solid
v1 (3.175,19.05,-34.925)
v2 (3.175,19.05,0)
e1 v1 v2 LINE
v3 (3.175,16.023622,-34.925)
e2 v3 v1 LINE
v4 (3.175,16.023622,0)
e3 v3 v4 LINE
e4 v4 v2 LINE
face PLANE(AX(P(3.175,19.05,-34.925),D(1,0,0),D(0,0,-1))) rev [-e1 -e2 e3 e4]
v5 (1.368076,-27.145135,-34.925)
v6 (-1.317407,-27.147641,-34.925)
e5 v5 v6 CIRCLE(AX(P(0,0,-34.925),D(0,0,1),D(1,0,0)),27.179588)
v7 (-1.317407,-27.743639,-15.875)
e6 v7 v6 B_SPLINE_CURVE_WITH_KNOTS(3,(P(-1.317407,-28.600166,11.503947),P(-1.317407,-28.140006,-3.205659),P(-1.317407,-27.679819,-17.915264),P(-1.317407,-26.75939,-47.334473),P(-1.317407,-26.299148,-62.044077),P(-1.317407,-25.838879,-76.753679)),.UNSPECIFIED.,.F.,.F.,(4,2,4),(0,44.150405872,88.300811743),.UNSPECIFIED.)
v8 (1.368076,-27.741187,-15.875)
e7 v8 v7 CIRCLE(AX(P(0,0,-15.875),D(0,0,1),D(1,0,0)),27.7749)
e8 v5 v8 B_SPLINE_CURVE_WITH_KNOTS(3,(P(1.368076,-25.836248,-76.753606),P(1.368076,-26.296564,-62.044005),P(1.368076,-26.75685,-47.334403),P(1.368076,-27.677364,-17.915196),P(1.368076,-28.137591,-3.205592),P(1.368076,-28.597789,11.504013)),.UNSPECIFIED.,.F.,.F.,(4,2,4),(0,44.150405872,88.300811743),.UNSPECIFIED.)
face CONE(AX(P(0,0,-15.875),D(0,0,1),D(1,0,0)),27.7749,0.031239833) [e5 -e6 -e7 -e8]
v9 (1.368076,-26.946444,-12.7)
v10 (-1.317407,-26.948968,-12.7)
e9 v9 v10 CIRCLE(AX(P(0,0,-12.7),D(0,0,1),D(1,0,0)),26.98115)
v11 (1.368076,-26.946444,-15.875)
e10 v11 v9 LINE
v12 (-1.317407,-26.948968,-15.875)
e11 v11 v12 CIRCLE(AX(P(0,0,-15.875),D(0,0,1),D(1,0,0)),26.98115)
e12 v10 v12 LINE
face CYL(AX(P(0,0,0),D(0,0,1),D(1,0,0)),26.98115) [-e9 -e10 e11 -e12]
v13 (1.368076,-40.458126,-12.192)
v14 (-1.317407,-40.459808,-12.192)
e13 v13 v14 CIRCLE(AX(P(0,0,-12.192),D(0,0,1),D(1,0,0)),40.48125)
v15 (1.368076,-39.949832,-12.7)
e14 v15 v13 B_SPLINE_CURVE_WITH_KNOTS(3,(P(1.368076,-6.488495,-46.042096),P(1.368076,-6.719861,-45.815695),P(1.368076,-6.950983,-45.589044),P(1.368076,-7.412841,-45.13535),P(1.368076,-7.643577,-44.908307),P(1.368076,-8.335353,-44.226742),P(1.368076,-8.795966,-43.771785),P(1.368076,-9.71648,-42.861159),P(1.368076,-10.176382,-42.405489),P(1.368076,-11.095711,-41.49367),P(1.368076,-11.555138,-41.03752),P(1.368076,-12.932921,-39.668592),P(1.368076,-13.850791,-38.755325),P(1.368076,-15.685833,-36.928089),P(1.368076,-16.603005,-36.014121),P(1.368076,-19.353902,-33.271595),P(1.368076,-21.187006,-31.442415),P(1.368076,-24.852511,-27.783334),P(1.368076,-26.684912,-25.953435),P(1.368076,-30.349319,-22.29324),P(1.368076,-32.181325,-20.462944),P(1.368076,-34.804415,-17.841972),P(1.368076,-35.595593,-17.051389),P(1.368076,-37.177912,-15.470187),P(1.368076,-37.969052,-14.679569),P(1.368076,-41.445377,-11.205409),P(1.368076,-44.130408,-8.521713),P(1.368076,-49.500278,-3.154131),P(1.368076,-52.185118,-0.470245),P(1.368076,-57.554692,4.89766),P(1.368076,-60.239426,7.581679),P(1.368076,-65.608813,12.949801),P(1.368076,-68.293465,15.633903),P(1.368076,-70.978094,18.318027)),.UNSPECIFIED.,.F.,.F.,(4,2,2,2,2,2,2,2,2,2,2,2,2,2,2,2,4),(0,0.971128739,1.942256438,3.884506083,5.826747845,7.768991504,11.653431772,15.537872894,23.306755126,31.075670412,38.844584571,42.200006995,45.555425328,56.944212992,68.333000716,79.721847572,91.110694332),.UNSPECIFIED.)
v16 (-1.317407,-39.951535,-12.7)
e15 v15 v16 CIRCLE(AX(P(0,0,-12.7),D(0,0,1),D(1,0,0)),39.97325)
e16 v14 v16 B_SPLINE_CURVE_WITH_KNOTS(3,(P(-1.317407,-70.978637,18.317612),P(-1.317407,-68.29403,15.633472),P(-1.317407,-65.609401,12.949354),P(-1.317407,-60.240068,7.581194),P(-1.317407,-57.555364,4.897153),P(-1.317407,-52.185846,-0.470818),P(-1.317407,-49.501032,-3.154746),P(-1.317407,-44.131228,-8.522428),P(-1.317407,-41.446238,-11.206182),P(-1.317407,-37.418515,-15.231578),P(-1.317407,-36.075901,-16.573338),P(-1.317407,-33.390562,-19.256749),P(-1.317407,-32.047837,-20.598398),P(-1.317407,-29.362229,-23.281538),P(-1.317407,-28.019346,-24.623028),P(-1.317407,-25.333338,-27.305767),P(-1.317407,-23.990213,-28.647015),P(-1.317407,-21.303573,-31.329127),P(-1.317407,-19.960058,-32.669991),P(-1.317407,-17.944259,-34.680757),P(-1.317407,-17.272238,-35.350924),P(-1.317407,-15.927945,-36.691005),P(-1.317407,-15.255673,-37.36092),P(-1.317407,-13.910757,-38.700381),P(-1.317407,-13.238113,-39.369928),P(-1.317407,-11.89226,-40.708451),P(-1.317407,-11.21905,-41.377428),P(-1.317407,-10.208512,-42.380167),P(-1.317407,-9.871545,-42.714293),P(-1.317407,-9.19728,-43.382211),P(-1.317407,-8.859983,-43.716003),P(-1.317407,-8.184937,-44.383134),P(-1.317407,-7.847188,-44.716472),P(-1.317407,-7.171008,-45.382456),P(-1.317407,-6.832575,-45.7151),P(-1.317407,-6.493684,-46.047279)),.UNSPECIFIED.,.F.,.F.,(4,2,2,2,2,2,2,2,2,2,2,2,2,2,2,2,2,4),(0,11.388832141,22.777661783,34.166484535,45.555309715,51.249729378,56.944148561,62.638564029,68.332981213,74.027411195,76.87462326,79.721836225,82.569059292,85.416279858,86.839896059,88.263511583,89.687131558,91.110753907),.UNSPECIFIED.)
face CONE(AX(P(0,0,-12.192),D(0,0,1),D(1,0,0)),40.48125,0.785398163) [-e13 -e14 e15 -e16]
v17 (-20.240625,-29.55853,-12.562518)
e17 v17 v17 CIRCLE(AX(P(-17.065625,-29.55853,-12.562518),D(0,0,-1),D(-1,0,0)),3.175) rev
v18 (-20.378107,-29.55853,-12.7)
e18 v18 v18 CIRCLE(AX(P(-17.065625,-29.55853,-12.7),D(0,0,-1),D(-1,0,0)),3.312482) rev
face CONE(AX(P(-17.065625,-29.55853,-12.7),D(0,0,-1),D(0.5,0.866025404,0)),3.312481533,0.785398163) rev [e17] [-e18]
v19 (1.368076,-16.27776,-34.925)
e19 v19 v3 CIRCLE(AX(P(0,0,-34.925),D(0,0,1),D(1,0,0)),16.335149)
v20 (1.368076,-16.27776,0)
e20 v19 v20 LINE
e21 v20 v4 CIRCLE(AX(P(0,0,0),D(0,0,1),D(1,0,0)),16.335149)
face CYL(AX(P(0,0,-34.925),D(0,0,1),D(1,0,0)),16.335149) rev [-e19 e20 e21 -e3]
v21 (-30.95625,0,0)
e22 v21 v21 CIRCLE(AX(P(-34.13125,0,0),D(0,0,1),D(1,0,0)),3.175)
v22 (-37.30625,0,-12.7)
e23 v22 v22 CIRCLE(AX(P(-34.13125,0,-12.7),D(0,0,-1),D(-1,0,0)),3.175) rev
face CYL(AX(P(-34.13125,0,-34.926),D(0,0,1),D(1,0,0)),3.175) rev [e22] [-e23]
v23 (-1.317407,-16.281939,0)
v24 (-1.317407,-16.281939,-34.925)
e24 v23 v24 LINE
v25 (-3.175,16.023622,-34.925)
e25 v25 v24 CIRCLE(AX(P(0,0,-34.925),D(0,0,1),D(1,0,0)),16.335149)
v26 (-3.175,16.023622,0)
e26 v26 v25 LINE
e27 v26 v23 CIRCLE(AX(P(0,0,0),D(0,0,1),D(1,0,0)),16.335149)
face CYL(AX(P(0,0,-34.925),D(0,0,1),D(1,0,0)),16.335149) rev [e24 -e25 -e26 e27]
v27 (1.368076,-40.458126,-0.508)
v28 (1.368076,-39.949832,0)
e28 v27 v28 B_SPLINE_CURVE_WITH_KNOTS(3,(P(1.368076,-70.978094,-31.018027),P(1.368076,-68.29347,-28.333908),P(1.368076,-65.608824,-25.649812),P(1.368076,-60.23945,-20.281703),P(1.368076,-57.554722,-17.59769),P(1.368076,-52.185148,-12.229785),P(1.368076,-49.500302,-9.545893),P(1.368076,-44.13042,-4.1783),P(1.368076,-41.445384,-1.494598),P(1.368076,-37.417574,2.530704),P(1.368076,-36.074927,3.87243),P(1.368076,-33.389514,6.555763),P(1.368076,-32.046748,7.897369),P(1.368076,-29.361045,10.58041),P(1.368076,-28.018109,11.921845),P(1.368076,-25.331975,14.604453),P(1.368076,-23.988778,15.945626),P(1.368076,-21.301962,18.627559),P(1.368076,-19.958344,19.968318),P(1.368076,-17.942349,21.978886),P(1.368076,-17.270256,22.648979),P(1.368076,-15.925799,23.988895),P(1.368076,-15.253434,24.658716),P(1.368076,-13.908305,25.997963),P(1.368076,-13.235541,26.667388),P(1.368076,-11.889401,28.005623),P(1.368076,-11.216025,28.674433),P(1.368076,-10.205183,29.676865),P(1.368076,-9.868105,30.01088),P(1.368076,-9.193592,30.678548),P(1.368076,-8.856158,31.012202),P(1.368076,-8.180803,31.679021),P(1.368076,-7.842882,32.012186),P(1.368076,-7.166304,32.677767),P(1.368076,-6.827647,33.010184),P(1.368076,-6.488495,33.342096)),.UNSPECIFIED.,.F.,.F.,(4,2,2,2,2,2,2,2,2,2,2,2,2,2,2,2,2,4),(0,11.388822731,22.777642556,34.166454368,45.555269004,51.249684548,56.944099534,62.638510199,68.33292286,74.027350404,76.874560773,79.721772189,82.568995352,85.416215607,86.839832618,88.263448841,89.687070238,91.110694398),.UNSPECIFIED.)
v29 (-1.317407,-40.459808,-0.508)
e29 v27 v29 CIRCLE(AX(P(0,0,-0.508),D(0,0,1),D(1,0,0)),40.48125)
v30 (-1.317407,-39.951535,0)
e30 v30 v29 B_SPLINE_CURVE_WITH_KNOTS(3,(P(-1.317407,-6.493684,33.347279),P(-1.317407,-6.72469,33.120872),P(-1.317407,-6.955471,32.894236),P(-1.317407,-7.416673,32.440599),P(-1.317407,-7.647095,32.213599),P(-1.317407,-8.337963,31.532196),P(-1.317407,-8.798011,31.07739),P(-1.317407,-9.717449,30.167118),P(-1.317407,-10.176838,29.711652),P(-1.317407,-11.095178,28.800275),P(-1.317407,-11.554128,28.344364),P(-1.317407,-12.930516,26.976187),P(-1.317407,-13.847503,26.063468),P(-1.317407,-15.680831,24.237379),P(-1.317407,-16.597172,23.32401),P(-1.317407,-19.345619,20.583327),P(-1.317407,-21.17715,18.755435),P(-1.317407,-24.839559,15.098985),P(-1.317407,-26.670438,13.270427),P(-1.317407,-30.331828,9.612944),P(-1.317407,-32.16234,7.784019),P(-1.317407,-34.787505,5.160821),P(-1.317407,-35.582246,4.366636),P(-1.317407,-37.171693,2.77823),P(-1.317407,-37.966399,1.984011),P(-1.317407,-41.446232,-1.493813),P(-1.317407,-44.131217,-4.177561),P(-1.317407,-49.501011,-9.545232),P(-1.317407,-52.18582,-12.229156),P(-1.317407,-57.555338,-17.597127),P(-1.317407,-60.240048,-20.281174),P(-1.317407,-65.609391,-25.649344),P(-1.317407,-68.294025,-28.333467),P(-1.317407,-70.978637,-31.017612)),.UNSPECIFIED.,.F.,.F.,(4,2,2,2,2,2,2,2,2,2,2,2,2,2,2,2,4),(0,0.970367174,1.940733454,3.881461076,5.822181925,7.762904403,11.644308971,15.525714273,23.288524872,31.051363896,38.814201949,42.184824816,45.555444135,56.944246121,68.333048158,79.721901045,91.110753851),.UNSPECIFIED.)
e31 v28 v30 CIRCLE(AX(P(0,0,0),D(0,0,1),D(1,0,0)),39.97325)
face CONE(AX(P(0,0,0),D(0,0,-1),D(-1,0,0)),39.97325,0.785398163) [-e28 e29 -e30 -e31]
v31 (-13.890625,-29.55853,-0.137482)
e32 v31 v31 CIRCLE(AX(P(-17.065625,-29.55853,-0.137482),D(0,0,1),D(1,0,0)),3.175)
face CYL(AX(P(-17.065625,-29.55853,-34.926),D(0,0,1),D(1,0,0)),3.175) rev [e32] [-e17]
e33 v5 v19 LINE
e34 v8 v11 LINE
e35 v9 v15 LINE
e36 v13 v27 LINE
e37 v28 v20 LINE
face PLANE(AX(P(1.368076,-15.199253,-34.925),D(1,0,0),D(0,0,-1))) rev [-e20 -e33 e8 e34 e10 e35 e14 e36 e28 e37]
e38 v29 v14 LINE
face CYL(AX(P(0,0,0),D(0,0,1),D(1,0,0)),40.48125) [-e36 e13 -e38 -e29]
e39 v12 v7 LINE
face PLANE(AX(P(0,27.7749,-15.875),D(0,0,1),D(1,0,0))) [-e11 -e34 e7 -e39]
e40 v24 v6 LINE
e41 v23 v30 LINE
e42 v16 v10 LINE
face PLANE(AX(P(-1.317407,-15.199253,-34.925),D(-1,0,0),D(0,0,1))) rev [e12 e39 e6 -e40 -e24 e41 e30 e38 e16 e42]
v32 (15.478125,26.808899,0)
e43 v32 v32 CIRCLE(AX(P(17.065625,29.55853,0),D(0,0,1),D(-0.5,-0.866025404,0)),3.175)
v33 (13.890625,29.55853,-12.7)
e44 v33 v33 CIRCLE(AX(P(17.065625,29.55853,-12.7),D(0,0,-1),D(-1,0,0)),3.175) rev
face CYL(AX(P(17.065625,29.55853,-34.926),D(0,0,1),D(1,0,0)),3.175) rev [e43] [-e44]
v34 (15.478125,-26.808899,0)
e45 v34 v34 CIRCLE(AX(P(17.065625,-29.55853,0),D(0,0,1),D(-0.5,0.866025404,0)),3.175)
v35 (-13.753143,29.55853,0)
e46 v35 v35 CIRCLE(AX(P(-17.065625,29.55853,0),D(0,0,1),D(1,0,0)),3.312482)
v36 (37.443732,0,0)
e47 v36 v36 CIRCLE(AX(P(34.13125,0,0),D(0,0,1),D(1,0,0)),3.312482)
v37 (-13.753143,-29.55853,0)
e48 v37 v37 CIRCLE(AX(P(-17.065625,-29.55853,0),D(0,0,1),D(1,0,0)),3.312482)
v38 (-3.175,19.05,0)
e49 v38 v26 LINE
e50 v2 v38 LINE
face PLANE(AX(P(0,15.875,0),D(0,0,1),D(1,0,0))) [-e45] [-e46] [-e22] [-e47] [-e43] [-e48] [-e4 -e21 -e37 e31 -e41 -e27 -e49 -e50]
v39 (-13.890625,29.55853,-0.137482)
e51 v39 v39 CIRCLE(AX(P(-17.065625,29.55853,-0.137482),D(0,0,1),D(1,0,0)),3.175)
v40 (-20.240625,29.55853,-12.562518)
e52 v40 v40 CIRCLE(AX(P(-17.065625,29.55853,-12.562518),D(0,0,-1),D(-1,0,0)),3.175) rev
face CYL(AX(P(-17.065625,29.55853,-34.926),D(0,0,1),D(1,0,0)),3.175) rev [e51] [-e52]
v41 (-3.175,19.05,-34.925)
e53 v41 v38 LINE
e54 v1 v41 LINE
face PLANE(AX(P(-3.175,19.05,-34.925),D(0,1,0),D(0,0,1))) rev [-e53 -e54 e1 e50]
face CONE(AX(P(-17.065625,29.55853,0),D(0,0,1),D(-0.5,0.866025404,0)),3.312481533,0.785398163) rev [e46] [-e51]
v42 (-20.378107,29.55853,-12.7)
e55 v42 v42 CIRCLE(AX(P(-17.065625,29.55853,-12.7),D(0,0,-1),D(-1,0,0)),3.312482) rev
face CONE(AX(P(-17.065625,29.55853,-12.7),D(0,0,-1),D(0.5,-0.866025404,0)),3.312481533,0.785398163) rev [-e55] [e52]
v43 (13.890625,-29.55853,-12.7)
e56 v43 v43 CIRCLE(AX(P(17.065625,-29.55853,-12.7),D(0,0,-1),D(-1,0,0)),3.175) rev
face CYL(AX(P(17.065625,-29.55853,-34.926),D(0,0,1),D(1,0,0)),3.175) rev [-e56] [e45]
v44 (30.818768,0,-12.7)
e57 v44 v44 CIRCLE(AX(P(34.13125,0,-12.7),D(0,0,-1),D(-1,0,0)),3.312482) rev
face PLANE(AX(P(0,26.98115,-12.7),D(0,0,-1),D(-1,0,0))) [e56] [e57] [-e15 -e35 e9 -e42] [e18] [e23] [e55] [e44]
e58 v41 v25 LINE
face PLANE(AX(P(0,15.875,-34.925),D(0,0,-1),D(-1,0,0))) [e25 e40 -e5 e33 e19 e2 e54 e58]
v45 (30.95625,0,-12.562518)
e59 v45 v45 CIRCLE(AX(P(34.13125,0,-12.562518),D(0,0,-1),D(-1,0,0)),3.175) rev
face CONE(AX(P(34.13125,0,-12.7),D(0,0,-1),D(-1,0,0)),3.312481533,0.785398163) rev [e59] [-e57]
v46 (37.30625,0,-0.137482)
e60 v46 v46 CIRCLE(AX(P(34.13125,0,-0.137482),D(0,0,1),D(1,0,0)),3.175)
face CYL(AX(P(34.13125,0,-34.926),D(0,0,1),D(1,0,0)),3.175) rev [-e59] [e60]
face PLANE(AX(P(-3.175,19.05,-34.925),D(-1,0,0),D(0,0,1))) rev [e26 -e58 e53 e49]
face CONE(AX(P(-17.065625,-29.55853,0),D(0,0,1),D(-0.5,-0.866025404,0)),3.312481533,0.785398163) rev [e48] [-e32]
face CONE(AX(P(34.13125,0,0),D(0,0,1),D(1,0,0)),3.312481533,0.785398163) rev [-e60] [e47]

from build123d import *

# Parameters (mm, degrees)
SKETCH3_W           = 1.016
SKETCH3_H           = 40.48125
CUT_EXTRUDE1_DEPTH  = 68.06130649
CUT_EXTRUDE2_REACH  = 69.061
SKETCH4_R           = 3.175
CIRPATTERN1_COUNT   = 3
SKETCH16_W          = 6.35
SKETCH16_H          = 6.35
CUT_EXTRUDE7_DEPTH  = 68.06130649
SKETCH24_R          = 16.335149264
CUT_EXTRUDE13_DEPTH = 68.06130649
SKETCH25_W          = 2.685482999
SKETCH25_H          = 26.348135083
CUT_EXTRUDE14_DEPTH = 68.06130649


# Read off the part's stored shape, not the designer's step: Cut-Extrude3, Cut-Extrude4
with BuildPart() as part:
    # Sketch1 → Revolve1 (revolve)
    with BuildSketch(Plane(origin=(0, 0, 0), x_dir=(0, 0, -1), z_dir=(1, 0, 0)), mode=Mode.PRIVATE) as revolve1_sk:
        Polygon((34.925, -27.1795875), (15.875, -27.7749), (15.875, -26.98115), (12.7, -26.98115), (12.7, -39.97325), (12.192, -40.48125), (0.508, -40.48125), (0, -39.97325), (0, -15.875), (34.925, -15.875), align=None)
    revolve(revolve1_sk.sketch.rotate(Axis((0, 0, 0), (0, 0, -1)), 270), axis=Axis((0, 0, 0), (0, 0, -1)))

    # Sketch3 → Cut-Extrude1 (cut, through all)
    with BuildSketch(Plane.XY):
        with Locations((0, -20.240625)):
            Rectangle(SKETCH3_W, SKETCH3_H)
    extrude(amount=-CUT_EXTRUDE1_DEPTH, mode=Mode.SUBTRACT)

    # Sketch4 → Cut-Extrude2 (cut, up to next)
    with BuildSketch(Plane.XY, mode=Mode.PRIVATE) as cut_extrude2_sk1:
        with Locations((34.13125, 0)):
            Circle(SKETCH4_R)
    cut_extrude2_tool1 = extrude(cut_extrude2_sk1.sketch, amount=-CUT_EXTRUDE2_REACH, mode=Mode.PRIVATE) & part.part
    # Sketch4 → Cut-Extrude2 (cut, up to next)
    with BuildSketch(Plane.XY, mode=Mode.PRIVATE) as cut_extrude2_sk2:
        with Locations((-34.13125, 0)):
            Circle(SKETCH4_R)
    cut_extrude2_tool2 = extrude(cut_extrude2_sk2.sketch, amount=-CUT_EXTRUDE2_REACH, mode=Mode.PRIVATE) & part.part
    cut_extrude2_1 = cut_extrude2_tool1.solids().sort_by_distance((34.13125, 0, 0))[0]
    add(cut_extrude2_1, mode=Mode.SUBTRACT)
    cut_extrude2_2 = cut_extrude2_tool2.solids().sort_by_distance((-34.13125, 0, 0))[0]
    add(cut_extrude2_2, mode=Mode.SUBTRACT)
    cut_extrude2 = cut_extrude2_1 + cut_extrude2_2  # Cut-Extrude2 as one shape, for the pattern or mirror that repeats it

    # Cut-Extrude3 outline → Cut-Extrude3 (revolve, cut)
    with BuildSketch(Plane(origin=(34.13125, 0, 0), x_dir=(1, 0, 0), z_dir=(0, -1, 0))):
        Polygon((3.175, 0), (3.175, -0.137481533), (3.312481533, 0), align=None)
    cut_extrude3 = revolve(axis=Axis((34.13125, 0, 0), (0, 0, 1)), mode=Mode.SUBTRACT)

    # Cut-Extrude4 outline → Cut-Extrude4 (revolve, cut)
    with BuildSketch(Plane(origin=(34.13125, 0, 0), x_dir=(1, 0, 0), z_dir=(0, -1, 0))):
        Polygon((3.312481533, -12.7), (3.175, -12.562518467), (3.175, -12.7), align=None)
    cut_extrude4 = revolve(axis=Axis((34.13125, 0, 0), (0, 0, 1)), mode=Mode.SUBTRACT)

    # CirPattern1: Cut-Extrude2, Cut-Extrude3, Cut-Extrude4 ×3 about axis
    cirpattern1_axis = Axis((0, 0, 0), (0, 0, 1))
    add([cut_extrude2.rotate(cirpattern1_axis, i * 360 / CIRPATTERN1_COUNT) for i in range(1, CIRPATTERN1_COUNT)], mode=Mode.SUBTRACT)
    add([cut_extrude3.rotate(cirpattern1_axis, i * 360 / CIRPATTERN1_COUNT) for i in range(1, CIRPATTERN1_COUNT)], mode=Mode.SUBTRACT)
    add([cut_extrude4.rotate(cirpattern1_axis, i * 360 / CIRPATTERN1_COUNT) for i in range(1, CIRPATTERN1_COUNT)], mode=Mode.SUBTRACT)

    # Sketch16 → Cut-Extrude7 (cut, through all)
    with BuildSketch(Plane.XY):
        with Locations((0, 15.875)):
            Rectangle(SKETCH16_W, SKETCH16_H)
    extrude(amount=-CUT_EXTRUDE7_DEPTH, mode=Mode.SUBTRACT)

    # Sketch24 → Cut-Extrude13 (cut, through all)
    with BuildSketch(Plane.XY):
        Circle(SKETCH24_R)
    extrude(amount=-CUT_EXTRUDE13_DEPTH, mode=Mode.SUBTRACT)

    # Sketch25 → Cut-Extrude14 (cut, through all)
    with BuildSketch(Plane.XY):
        with Locations((0.025334746, -28.373320916)):
            Rectangle(SKETCH25_W, SKETCH25_H)
    extrude(amount=-CUT_EXTRUDE14_DEPTH, mode=Mode.SUBTRACT)


solid = part.part
